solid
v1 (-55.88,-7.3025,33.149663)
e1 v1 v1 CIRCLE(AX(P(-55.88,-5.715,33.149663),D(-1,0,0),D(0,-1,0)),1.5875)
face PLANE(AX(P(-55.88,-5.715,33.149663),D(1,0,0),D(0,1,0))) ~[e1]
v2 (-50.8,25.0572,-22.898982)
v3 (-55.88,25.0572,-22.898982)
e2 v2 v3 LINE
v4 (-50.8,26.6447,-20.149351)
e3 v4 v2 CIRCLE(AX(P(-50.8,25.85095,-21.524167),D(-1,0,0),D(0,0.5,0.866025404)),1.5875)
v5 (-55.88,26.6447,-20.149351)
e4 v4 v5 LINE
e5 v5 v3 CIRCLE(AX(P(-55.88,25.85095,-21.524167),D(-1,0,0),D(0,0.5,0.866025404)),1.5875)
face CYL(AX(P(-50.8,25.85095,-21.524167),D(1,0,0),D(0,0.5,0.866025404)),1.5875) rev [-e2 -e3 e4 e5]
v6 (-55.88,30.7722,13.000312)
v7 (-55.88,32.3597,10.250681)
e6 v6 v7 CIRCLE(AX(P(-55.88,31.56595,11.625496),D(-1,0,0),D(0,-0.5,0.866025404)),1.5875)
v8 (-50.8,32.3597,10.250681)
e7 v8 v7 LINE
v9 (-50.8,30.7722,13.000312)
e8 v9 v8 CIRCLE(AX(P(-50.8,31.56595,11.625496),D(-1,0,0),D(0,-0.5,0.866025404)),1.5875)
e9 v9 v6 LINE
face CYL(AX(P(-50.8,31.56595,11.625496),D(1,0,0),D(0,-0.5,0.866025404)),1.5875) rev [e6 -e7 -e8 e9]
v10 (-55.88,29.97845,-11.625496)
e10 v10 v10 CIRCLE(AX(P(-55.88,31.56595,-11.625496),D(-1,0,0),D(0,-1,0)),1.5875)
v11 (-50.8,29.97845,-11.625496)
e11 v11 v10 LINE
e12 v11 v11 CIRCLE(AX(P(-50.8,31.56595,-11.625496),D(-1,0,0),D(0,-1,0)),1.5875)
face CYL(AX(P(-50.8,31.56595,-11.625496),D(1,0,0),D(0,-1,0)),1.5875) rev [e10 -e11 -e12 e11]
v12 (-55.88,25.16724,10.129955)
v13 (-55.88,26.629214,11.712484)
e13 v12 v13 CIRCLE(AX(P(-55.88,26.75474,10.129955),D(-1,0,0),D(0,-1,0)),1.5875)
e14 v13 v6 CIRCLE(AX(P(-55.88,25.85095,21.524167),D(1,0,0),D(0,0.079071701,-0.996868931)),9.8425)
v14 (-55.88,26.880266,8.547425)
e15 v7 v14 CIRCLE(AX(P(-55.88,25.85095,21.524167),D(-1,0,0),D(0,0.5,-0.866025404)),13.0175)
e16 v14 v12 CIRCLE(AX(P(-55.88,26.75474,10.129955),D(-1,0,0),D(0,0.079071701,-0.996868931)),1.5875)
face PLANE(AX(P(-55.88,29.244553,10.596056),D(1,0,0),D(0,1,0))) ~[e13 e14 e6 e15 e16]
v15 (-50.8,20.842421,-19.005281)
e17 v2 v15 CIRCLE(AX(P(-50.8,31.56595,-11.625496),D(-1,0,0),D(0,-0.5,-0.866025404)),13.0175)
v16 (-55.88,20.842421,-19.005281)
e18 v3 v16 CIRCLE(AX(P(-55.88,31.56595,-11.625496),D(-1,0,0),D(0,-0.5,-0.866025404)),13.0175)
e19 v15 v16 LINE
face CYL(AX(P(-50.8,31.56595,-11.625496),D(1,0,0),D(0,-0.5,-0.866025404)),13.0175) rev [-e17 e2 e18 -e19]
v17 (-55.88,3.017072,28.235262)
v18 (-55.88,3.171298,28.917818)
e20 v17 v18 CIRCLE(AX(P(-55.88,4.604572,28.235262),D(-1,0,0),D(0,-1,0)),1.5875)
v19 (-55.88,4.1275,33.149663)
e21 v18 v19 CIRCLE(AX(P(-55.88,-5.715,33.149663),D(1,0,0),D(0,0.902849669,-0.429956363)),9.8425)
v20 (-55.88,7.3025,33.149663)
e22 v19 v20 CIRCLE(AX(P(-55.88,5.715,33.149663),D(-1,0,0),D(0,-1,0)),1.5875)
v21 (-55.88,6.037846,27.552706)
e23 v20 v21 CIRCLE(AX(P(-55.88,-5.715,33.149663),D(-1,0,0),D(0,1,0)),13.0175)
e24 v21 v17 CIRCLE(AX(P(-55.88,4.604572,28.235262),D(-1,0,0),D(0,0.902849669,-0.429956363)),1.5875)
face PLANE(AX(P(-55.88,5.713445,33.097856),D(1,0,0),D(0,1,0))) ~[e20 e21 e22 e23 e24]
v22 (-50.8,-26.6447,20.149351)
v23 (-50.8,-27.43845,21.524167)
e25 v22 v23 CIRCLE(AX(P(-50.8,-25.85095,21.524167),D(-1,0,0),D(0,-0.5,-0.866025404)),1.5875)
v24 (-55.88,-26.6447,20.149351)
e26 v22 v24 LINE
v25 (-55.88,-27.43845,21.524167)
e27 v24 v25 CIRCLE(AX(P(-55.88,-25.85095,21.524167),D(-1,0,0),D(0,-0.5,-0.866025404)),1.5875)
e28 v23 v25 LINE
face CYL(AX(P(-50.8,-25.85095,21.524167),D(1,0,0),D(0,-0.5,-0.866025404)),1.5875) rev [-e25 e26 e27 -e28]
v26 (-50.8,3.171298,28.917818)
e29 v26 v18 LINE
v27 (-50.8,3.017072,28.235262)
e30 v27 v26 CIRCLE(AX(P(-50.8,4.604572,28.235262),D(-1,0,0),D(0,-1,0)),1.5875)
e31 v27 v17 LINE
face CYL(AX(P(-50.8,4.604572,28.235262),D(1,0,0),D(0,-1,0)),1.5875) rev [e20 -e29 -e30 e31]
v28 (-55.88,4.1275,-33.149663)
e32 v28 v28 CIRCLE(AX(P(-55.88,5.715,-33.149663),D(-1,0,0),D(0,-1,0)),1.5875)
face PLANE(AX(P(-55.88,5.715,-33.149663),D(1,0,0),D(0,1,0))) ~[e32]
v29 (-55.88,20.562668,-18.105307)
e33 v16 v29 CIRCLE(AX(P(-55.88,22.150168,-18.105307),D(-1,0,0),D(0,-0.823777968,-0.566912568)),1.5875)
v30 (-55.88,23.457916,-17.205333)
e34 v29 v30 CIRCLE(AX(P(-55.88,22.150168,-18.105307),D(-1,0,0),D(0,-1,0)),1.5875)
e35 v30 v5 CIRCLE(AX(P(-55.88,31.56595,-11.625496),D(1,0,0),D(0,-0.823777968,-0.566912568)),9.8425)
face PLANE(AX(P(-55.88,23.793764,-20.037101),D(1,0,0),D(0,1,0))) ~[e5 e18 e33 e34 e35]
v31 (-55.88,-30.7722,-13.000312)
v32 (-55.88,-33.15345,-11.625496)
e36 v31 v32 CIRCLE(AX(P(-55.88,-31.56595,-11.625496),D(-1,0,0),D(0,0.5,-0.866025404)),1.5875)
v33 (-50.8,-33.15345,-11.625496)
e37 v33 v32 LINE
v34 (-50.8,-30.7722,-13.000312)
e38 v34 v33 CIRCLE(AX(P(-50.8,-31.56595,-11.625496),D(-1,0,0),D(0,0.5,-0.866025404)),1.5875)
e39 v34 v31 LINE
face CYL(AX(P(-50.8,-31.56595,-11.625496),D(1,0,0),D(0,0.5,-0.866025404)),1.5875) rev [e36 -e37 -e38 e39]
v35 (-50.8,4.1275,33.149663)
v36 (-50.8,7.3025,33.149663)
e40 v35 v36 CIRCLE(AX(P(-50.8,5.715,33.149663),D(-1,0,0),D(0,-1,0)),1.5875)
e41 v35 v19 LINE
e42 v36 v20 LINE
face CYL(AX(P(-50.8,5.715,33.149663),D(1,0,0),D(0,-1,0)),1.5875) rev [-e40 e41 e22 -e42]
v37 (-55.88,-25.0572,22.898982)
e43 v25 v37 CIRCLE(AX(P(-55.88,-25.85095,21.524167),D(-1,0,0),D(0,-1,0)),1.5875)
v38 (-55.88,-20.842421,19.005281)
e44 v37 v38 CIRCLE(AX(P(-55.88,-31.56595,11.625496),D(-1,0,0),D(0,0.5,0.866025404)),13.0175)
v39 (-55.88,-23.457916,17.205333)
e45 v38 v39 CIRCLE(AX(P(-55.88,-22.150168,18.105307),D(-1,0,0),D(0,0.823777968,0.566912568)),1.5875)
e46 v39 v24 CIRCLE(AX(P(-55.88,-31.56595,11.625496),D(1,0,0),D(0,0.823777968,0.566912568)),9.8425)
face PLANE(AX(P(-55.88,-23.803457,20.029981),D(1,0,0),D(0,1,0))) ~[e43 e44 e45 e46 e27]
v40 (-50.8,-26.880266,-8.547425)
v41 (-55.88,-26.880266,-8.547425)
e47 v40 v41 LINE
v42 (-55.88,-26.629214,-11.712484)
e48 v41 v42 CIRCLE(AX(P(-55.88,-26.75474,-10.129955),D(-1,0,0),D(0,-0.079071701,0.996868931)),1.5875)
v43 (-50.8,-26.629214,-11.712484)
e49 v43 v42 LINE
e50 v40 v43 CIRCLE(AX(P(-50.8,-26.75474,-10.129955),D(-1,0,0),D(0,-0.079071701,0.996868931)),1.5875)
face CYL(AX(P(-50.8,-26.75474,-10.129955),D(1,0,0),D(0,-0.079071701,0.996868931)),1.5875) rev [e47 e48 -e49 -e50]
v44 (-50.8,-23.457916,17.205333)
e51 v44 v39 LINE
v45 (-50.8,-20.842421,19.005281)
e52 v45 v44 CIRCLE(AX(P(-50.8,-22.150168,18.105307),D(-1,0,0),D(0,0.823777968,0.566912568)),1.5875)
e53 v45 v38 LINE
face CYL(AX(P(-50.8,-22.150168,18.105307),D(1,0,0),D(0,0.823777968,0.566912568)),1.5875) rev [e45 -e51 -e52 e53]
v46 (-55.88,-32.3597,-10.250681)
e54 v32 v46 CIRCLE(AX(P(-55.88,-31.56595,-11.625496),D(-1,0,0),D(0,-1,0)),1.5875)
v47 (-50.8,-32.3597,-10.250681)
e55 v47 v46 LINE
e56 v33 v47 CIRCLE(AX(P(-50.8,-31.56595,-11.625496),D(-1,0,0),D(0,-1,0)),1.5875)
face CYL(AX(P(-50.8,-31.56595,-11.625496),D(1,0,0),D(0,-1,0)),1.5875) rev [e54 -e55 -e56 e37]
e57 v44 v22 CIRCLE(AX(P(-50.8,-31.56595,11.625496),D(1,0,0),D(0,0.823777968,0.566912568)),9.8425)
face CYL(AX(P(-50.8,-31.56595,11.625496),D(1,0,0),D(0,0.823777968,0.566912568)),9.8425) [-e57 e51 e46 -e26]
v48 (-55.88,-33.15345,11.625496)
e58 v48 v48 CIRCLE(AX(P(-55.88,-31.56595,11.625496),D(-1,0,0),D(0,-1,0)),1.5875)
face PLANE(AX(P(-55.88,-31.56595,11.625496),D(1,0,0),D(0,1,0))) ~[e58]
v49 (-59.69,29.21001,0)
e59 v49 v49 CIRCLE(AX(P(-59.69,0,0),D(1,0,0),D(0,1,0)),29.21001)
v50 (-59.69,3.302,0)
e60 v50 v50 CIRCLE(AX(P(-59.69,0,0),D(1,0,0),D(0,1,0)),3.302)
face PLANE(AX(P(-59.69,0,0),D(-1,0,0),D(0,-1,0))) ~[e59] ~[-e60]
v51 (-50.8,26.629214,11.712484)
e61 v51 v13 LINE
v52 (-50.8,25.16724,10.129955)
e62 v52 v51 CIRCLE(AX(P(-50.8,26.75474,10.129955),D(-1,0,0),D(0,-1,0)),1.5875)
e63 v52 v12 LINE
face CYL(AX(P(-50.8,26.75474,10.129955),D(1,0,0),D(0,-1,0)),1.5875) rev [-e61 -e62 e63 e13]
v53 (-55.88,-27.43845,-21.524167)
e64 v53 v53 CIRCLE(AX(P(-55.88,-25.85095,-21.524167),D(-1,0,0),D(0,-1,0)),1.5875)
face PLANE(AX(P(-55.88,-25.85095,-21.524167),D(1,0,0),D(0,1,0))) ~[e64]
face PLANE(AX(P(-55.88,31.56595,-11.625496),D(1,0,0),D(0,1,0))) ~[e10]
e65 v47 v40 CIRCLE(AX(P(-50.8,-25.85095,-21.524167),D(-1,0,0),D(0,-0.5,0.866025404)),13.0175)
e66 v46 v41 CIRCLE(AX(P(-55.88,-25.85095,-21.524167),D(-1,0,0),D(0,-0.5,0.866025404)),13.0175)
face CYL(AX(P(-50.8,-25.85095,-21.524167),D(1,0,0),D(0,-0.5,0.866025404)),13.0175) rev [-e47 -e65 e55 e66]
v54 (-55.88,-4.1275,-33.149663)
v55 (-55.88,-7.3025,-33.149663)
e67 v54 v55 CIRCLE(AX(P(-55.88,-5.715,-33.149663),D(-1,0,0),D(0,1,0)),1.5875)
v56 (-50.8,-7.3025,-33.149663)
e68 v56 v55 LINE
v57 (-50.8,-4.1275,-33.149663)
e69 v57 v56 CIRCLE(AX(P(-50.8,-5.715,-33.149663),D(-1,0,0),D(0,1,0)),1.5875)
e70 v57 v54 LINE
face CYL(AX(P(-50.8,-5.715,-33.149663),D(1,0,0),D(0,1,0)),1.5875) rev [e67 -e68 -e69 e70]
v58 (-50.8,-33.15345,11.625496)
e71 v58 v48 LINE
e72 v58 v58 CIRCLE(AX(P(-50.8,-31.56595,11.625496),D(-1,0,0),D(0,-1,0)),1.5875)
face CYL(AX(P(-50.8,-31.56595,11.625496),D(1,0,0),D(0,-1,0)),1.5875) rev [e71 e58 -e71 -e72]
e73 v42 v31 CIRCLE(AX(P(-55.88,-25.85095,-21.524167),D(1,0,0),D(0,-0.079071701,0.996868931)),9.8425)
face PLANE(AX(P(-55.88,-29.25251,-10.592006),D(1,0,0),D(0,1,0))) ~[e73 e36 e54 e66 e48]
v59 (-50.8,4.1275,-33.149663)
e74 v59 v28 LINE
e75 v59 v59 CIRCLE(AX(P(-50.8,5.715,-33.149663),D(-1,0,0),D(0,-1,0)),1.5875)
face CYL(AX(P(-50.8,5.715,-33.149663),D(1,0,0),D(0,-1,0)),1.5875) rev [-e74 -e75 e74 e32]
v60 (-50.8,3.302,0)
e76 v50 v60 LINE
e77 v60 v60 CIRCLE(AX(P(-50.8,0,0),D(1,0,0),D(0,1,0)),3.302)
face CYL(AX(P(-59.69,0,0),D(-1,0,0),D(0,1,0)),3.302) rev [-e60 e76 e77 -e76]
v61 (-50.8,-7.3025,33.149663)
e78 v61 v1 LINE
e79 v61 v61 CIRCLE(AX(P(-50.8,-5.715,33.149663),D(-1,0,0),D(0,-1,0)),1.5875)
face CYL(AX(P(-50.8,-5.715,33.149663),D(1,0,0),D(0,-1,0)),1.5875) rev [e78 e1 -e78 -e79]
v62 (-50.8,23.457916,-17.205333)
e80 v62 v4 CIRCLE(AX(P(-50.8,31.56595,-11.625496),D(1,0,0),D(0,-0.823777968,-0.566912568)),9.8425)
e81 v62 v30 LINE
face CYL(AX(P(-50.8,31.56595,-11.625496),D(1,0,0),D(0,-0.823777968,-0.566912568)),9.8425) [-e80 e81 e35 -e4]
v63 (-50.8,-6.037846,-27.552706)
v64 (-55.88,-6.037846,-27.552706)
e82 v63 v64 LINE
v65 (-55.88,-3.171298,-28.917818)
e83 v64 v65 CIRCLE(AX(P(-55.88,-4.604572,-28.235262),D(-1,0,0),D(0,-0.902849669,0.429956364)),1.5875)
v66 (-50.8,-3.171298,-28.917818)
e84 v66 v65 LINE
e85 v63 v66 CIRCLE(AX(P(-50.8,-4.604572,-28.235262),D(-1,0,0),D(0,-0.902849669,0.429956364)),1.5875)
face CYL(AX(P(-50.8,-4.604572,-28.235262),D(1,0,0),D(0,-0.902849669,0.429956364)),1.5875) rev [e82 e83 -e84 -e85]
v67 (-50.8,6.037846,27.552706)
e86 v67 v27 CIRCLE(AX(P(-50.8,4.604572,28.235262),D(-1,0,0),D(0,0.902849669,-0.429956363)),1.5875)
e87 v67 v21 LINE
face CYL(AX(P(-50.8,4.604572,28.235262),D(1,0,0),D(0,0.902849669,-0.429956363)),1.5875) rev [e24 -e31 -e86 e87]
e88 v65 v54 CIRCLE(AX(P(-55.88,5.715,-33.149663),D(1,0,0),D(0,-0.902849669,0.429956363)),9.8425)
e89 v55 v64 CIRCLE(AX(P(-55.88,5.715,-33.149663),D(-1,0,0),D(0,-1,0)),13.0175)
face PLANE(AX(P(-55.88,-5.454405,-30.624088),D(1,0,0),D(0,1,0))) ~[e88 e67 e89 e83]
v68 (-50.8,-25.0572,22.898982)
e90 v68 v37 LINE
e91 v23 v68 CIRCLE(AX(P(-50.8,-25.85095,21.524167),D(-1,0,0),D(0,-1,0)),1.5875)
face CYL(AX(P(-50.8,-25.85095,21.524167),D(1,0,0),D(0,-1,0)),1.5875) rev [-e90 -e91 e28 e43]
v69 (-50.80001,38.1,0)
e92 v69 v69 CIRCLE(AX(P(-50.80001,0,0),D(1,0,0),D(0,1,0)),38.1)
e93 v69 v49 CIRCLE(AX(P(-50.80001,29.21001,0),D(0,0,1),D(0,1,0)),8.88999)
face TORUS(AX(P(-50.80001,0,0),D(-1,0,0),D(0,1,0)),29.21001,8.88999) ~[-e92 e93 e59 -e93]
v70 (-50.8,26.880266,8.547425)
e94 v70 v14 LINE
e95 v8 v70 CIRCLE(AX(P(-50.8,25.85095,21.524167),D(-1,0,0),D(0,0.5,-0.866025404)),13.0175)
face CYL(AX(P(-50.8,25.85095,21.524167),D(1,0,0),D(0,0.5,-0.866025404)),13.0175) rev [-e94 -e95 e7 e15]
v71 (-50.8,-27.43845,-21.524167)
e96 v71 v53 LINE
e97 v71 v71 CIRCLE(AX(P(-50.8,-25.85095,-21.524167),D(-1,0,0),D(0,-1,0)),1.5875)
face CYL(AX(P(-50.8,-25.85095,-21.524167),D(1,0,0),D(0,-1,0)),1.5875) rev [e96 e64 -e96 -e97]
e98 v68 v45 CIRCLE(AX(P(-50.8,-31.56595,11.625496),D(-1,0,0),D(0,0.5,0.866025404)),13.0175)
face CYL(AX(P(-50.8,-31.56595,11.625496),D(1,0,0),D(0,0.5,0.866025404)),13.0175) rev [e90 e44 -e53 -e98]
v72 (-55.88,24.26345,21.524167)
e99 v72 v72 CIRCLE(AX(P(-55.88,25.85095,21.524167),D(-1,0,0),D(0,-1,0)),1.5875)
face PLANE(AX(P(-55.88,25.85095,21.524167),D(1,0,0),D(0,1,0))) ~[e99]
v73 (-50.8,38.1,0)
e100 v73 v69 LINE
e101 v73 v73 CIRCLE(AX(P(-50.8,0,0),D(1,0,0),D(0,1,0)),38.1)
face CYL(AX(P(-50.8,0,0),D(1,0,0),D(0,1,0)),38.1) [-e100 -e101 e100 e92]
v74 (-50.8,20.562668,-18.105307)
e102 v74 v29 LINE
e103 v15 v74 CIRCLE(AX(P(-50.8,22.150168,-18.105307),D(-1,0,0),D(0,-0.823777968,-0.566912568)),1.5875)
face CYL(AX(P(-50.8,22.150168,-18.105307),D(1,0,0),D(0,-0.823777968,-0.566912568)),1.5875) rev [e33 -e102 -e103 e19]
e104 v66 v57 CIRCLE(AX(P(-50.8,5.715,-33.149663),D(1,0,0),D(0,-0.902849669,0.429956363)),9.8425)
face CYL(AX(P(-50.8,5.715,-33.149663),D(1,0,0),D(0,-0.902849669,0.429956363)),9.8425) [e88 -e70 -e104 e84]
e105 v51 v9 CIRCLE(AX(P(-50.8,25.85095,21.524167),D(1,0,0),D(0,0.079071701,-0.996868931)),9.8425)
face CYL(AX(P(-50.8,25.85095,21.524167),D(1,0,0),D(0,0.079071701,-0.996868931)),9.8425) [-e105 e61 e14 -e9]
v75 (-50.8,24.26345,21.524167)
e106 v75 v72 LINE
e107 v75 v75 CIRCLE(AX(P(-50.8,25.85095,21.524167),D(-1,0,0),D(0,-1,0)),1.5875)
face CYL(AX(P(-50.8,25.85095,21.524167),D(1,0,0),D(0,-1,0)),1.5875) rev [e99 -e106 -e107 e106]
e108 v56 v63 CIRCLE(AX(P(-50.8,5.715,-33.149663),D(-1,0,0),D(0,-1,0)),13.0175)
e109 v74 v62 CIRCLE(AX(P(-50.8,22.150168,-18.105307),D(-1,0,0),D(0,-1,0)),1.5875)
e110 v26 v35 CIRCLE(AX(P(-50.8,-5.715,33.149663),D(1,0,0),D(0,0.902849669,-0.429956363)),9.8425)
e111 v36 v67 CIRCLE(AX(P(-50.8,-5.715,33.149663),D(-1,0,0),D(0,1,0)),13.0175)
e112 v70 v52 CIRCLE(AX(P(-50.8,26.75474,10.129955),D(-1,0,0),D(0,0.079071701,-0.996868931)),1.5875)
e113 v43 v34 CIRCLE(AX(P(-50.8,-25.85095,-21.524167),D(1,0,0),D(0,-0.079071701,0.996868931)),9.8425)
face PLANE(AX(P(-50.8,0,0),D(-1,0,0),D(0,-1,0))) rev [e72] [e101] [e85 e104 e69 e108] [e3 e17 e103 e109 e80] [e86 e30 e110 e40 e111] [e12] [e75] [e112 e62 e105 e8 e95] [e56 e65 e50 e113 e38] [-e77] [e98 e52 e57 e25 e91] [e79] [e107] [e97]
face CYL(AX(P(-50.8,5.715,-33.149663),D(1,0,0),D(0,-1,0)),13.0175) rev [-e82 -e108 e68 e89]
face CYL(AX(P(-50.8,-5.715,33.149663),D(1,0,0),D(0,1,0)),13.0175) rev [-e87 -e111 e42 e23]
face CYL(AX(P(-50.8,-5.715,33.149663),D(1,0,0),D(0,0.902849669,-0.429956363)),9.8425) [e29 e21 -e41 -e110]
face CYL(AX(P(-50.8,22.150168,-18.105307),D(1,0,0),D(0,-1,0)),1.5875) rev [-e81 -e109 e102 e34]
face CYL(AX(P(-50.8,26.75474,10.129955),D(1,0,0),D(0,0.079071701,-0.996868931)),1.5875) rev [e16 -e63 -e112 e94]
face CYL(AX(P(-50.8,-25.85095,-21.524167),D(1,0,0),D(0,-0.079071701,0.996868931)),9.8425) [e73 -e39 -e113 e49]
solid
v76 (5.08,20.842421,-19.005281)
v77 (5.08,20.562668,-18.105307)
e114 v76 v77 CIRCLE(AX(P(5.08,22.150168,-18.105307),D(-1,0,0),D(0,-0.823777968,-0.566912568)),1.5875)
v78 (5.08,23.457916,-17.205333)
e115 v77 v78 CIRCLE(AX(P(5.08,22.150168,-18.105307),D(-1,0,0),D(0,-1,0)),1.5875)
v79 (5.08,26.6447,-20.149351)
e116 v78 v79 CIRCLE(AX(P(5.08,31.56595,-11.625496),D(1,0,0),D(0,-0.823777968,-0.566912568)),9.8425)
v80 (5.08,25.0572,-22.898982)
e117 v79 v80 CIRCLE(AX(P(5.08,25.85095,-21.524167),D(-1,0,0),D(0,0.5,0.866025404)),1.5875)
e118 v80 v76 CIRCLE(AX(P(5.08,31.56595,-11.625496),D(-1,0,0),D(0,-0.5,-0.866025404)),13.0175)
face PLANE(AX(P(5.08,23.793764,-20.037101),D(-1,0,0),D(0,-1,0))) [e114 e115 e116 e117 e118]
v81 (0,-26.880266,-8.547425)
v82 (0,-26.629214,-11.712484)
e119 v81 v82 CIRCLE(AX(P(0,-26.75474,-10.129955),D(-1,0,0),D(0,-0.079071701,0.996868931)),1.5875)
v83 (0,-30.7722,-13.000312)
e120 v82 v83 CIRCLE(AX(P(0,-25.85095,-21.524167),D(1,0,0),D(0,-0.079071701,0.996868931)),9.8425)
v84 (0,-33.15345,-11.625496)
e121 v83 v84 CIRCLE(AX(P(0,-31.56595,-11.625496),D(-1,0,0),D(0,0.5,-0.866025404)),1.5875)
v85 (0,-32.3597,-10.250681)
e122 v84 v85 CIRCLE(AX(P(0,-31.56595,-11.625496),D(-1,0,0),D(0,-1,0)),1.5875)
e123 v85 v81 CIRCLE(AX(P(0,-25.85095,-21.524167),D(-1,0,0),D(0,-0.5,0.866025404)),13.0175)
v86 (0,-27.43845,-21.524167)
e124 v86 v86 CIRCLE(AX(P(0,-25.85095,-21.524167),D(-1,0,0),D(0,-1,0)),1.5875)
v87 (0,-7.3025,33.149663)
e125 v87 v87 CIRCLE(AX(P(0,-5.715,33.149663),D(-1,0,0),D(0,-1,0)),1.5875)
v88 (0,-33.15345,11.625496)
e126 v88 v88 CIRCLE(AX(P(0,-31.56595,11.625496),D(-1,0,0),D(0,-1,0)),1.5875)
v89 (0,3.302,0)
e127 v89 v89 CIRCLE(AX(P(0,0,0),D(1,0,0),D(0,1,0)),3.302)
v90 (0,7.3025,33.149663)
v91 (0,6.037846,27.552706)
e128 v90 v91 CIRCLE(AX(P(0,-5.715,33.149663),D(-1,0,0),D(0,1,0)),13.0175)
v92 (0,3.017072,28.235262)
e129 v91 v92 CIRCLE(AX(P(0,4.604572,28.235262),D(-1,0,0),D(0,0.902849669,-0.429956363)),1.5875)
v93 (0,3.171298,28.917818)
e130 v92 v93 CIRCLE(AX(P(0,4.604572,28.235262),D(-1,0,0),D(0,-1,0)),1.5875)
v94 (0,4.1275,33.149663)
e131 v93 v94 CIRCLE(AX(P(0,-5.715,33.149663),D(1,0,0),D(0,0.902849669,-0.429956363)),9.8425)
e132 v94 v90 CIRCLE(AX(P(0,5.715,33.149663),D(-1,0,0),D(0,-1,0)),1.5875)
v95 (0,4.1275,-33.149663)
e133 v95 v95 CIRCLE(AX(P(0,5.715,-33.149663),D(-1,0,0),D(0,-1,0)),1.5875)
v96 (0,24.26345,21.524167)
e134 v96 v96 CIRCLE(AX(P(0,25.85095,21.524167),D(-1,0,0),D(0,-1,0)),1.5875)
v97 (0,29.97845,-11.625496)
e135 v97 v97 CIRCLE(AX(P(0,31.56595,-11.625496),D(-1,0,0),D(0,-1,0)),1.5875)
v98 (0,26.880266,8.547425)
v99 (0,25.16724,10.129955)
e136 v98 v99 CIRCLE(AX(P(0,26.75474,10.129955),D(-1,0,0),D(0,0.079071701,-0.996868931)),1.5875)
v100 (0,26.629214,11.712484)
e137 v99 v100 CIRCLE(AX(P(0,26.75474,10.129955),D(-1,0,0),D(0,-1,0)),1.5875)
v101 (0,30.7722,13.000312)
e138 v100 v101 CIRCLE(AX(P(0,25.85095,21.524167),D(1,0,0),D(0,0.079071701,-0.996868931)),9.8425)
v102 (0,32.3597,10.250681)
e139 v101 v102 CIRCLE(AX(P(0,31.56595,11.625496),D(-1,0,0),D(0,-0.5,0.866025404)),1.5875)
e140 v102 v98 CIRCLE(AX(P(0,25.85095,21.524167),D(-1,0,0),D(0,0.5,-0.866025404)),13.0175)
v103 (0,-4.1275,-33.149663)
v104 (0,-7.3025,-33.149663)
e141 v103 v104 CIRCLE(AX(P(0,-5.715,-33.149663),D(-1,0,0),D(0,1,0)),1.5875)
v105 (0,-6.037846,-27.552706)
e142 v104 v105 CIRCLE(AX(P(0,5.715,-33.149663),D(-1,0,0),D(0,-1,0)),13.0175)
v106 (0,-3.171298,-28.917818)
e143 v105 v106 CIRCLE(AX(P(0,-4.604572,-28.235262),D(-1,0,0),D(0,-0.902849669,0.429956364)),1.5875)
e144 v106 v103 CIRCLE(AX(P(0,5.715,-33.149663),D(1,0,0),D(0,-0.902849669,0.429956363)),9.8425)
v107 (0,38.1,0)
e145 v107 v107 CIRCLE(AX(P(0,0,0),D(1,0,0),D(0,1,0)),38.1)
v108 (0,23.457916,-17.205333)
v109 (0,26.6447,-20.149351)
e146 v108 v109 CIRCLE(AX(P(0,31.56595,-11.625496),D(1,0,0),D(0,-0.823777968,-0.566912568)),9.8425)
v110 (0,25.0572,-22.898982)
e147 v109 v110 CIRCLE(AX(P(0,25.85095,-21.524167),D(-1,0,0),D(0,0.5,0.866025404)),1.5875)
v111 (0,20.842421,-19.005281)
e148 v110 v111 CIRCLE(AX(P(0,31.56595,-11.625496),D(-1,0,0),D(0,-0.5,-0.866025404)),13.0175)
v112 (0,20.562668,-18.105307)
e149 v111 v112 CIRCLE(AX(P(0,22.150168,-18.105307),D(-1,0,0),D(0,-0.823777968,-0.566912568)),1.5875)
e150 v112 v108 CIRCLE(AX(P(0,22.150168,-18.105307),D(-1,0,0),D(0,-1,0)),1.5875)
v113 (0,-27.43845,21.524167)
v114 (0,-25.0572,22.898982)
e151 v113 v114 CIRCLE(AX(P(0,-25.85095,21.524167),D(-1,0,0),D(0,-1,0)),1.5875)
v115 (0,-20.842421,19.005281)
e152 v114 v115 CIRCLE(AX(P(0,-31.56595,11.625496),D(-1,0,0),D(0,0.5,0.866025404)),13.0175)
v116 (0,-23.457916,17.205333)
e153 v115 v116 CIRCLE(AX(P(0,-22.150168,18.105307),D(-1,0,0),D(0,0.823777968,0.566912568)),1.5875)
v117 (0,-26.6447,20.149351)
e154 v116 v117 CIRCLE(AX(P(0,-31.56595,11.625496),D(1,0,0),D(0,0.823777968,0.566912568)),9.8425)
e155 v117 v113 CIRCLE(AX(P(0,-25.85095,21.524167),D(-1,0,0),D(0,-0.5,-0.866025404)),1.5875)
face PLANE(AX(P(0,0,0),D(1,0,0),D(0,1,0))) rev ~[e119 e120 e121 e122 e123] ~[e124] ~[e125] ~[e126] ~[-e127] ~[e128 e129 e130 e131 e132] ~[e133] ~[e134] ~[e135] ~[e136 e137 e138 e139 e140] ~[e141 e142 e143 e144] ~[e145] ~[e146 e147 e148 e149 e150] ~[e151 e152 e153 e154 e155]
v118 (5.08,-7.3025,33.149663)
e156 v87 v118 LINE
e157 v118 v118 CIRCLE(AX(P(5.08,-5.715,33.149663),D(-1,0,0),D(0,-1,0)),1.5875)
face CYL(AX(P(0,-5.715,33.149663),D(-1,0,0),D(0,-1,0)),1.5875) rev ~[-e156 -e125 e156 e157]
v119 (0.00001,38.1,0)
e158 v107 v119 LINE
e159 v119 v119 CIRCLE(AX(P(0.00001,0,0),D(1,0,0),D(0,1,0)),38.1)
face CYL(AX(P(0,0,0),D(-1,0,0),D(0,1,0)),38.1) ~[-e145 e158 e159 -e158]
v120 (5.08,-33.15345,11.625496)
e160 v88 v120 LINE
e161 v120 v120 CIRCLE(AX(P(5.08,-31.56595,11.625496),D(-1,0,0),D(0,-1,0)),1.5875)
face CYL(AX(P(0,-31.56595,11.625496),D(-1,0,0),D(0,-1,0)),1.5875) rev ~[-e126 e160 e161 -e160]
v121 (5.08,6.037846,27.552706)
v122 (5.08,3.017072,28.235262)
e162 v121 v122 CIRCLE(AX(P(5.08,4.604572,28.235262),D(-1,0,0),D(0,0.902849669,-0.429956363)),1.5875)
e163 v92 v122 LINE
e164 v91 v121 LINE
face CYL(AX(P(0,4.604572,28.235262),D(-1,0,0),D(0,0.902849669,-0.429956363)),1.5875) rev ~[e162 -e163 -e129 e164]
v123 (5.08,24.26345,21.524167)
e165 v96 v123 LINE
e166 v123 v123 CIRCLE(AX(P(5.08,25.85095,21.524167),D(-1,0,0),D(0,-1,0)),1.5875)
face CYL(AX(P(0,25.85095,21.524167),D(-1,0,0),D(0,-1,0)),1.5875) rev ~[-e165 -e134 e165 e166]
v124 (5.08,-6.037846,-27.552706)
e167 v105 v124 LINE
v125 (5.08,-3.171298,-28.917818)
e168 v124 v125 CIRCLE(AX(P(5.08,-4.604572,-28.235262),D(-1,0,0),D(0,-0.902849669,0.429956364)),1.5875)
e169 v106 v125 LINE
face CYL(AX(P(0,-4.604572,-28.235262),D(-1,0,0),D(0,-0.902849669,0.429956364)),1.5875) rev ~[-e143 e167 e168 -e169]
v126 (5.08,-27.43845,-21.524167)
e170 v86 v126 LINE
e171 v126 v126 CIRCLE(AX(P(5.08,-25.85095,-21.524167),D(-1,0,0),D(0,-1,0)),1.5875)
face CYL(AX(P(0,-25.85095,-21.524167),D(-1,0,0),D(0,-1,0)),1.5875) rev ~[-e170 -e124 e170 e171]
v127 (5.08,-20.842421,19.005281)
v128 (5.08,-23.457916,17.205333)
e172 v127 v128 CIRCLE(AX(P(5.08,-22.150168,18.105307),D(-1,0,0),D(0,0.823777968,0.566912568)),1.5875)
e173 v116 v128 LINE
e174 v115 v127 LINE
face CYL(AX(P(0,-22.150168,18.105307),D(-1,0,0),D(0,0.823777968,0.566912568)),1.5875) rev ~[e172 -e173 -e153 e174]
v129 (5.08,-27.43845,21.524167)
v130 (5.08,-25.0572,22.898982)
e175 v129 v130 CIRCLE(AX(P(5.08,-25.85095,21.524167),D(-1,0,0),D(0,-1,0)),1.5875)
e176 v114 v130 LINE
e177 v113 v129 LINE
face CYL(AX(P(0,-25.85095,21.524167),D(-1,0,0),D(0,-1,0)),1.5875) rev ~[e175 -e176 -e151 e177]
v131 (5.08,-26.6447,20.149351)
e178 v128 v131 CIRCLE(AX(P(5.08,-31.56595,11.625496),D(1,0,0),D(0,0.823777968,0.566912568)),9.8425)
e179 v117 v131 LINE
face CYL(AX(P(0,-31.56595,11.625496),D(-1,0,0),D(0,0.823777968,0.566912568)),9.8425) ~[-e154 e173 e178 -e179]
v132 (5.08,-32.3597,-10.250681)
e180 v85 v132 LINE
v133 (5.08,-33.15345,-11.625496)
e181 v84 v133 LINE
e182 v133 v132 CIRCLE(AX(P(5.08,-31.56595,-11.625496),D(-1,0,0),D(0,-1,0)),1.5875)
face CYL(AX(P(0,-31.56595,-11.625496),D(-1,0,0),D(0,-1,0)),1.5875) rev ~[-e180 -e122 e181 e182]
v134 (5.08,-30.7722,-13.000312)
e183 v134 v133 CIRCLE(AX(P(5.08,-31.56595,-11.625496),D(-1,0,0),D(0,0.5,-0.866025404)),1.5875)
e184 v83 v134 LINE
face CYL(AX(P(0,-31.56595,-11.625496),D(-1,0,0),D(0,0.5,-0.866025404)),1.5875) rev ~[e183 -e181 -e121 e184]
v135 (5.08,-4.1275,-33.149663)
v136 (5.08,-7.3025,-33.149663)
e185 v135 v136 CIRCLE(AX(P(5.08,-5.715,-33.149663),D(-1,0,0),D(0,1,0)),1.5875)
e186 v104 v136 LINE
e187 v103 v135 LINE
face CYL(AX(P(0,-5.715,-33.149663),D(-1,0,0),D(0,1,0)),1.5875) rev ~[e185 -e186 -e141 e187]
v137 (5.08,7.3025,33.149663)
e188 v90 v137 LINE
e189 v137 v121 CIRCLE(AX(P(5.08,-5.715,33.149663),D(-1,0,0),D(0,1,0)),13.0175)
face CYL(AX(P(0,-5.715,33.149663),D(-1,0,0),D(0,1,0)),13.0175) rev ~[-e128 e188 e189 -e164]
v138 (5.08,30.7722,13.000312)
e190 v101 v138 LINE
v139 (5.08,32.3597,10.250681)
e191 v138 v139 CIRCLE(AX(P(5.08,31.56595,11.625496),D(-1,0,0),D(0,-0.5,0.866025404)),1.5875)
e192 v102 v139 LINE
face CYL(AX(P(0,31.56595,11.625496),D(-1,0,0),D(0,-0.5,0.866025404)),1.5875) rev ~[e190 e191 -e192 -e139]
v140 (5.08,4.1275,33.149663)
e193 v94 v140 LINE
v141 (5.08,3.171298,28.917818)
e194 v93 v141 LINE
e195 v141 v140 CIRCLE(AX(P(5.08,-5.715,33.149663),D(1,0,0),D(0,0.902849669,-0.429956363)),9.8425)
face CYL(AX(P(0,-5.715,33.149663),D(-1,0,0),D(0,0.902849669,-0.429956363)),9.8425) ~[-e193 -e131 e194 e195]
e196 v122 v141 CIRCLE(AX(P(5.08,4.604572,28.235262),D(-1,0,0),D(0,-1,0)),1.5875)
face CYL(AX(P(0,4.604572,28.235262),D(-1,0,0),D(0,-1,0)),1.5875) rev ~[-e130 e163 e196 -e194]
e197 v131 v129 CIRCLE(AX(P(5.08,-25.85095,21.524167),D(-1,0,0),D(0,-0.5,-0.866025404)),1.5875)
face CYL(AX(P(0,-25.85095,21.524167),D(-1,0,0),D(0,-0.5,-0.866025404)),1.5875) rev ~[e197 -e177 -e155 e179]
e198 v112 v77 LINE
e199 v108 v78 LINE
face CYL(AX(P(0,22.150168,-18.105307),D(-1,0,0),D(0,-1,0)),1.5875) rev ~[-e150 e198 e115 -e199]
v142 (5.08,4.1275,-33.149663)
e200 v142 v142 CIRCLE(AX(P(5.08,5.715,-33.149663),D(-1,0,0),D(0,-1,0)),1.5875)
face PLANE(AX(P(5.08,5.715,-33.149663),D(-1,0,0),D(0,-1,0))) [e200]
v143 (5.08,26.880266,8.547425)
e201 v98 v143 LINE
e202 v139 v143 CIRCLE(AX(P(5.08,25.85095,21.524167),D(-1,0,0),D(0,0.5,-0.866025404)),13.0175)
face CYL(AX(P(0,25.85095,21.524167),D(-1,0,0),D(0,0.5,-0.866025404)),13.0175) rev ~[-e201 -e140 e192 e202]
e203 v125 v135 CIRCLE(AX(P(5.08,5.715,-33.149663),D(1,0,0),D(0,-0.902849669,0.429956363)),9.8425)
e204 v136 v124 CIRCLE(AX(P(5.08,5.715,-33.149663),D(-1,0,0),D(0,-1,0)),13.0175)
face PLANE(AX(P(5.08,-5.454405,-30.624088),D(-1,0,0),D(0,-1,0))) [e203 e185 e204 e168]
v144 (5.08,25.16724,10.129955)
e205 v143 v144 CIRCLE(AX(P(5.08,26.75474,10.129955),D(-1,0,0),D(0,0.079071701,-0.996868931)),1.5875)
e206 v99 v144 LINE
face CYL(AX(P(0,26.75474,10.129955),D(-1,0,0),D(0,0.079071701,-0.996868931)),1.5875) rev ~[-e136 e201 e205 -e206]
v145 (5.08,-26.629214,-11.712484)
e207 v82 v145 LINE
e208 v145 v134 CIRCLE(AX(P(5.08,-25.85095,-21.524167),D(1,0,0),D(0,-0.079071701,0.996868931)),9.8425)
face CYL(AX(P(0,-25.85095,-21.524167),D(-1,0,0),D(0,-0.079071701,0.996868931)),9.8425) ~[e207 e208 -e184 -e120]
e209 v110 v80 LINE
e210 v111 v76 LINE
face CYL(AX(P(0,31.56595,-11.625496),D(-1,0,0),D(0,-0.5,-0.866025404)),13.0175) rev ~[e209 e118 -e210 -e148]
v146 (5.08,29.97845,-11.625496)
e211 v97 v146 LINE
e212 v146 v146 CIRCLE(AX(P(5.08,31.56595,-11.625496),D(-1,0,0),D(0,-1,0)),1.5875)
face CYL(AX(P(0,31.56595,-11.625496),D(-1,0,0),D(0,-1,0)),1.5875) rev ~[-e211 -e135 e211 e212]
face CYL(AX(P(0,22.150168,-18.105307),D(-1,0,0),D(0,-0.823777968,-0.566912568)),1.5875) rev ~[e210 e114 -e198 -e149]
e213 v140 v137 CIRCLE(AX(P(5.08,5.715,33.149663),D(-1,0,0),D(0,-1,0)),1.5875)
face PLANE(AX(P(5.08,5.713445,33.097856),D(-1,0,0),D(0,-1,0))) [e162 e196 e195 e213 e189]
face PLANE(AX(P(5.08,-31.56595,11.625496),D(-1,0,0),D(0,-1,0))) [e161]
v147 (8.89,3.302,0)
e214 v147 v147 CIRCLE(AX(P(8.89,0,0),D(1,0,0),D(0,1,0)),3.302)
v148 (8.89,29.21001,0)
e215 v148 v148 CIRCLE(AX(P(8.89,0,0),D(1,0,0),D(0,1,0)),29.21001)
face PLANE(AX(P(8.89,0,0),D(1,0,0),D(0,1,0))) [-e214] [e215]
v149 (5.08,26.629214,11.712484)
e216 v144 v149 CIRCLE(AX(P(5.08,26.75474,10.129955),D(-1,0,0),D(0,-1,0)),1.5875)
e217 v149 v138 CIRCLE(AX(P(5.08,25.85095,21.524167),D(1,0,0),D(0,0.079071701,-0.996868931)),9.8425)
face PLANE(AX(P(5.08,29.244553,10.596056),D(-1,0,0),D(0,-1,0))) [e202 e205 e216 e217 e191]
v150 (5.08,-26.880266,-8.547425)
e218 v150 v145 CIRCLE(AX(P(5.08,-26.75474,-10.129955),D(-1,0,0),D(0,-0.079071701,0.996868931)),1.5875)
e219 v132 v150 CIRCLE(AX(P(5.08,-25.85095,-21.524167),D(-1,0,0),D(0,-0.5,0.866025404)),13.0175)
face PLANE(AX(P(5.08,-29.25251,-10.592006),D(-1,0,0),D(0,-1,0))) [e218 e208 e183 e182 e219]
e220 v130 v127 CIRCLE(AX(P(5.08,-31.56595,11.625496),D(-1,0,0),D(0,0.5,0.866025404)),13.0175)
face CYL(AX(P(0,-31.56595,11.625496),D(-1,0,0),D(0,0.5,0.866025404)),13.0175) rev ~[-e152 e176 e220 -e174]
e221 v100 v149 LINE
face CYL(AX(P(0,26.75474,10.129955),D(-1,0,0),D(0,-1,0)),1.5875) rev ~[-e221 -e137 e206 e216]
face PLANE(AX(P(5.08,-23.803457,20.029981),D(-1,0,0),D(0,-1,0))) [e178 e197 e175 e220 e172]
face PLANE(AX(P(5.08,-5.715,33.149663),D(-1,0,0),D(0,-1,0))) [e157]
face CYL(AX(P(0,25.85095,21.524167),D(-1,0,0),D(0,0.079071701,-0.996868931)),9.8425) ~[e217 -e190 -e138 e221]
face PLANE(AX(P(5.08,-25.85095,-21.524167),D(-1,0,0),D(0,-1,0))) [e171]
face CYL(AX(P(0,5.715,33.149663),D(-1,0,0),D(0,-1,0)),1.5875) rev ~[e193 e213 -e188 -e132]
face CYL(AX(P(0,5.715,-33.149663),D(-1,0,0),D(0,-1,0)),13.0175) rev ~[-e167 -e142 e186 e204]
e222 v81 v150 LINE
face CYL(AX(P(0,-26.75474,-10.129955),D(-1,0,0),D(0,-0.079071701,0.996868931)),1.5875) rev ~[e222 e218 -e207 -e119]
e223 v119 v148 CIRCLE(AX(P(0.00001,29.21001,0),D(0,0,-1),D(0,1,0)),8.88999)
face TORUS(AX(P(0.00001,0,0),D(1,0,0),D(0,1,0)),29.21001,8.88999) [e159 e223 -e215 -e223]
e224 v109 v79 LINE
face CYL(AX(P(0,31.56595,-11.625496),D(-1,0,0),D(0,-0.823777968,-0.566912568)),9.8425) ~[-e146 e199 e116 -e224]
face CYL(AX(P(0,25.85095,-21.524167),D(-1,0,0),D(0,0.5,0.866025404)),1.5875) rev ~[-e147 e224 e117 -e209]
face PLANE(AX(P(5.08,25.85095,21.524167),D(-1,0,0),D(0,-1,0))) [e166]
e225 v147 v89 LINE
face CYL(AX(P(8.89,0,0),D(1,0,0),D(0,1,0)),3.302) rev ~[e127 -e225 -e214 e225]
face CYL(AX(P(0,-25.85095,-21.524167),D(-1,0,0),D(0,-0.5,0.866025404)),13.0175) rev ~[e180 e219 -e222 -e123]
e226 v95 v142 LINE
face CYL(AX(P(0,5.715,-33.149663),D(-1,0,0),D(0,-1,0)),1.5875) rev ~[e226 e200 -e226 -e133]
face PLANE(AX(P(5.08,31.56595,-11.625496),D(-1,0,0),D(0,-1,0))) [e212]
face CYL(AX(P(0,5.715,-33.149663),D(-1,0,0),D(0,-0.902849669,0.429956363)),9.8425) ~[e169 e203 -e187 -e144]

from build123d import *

# Parameters (mm, degrees)
F0_R     = 38.1
F1_DEPTH = 8.89
F2_R     = 8.88999
F3_R     = 3.302
F4_DEPTH = 8.89
F5_R     = 1.5875
F6_DEPTH = 5.08


# Not quite as in the source:
# - a fillet or chamfer is up to 0.001 mm smaller than in the source, because OpenCascade refuses the exact size


with BuildPart() as f1:
    # F0 (on Right) → F1 (new body)
    with BuildSketch(Plane.YZ):
        Circle(F0_R)
    extrude(amount=F1_DEPTH)

    # F2 (radius 8.89 in the source; OpenCascade refuses exactly that, so slightly less here)
    f2_edges = [f1.edges().sort_by_distance(p)[0] for p in [
        (8.89, -38.1, 0),
    ]]
    fillet(f2_edges, radius=F2_R)

    # F3 (on face) → F4 (cut)
    with BuildSketch(Plane.YZ.offset(8.89)):
        Circle(F3_R)
    extrude(amount=-F4_DEPTH, mode=Mode.SUBTRACT)

    # F5 (on face) → F6 (cut)
    with BuildSketch(Plane(origin=(0, 0, 0), x_dir=(0, -1, 0), z_dir=(-1, 0, 0))):
        with Locations((5.715, 33.1496630312)):
            Circle(F5_R)
        with BuildLine():
            ThreePointArc((-5.6047569444, 31.5659955413), (-4.5541453363, 32.0668090708), (-4.1275, 33.1496630312))
            ThreePointArc((-4.1275, 33.1496630312), (-5.715, 34.7371630312), (-7.3025, 33.1496630312))
            ThreePointArc((-7.3025, 33.1496630312), (-6.7978539604, 31.9888083675), (-5.6047569444, 31.5659955413))
        make_face()
        with BuildLine():
            ThreePointArc((-3.1712978707, 28.9178175232), (-3.8854737654, 30.9803982412), (-4.1275, 33.1496630312))
            ThreePointArc((-4.1275, 33.1496630312), (-4.5541453363, 32.0668090708), (-5.6047569444, 31.5659955413))
            ThreePointArc((-5.6047569444, 31.5659955413), (-5.433937276, 30.6305168235), (-5.1859467295, 29.712475169))
            ThreePointArc((-5.1859467295, 29.712475169), (-4.0220744225, 29.712032986), (-3.1712978707, 28.9178175232))
        make_face()
        with BuildLine():
            ThreePointArc((-5.6047569444, 31.5659955413), (-6.7978539604, 31.9888083675), (-7.3025, 33.1496630312))
            ThreePointArc((-7.3025, 33.1496630312), (-6.9824007866, 30.2806354058), (-6.0378455709, 27.552706069))
            ThreePointArc((-6.0378455709, 27.552706069), (-6.0813429107, 28.8177590943), (-5.1859467295, 29.712475169))
            ThreePointArc((-5.1859467295, 29.712475169), (-5.433937276, 30.6305168235), (-5.6047569444, 31.5659955413))
        make_face()
        with BuildLine():
            ThreePointArc((-3.0170717208, 28.2352617961), (-3.0561082102, 28.5851432138), (-3.1712978707, 28.9178175232))
            ThreePointArc((-3.1712978707, 28.9178175232), (-4.0220744225, 29.712032986), (-5.1859467295, 29.712475169))
            ThreePointArc((-5.1859467295, 29.712475169), (-6.0813429107, 28.8177590943), (-6.0378455709, 27.552706069))
            ThreePointArc((-6.0378455709, 27.552706069), (-4.254690303, 26.6867982855), (-3.0170717208, 28.2352617961))
        make_face()
        with BuildLine():
            ThreePointArc((-26.6292135324, 11.7124842426), (-28.772548779, 12.125280134), (-30.7722003119, 13.0003116615))
            ThreePointArc((-30.7722003119, 13.0003116615), (-30.1911349834, 12.419246333), (-29.9784503119, 11.625496333))
            ThreePointArc((-29.9784503119, 11.625496333), (-30.7722003119, 10.2506810045), (-32.3597003119, 10.2506810045))
            ThreePointArc((-32.3597003119, 10.2506810045), (-29.7149998974, 9.0933812423), (-26.8802661842, 8.547425386))
            ThreePointArc((-26.8802661842, 8.547425386), (-28.3372692866, 10.2554811402), (-26.6292135324, 11.7124842426))
        make_face()
        with BuildLine():
            ThreePointArc((-29.9784503119, 11.625496333), (-30.1911349834, 12.419246333), (-30.7722003119, 13.0003116615))
            ThreePointArc((-30.7722003119, 13.0003116615), (-32.9407656404, 12.419246333), (-32.3597003119, 10.2506810045))
            ThreePointArc((-32.3597003119, 10.2506810045), (-30.7722003119, 10.2506810045), (-29.9784503119, 11.625496333))
        make_face()
        with BuildLine():
            ThreePointArc((-25.1672398583, 10.1299548143), (-25.5886718302, 11.2071927657), (-26.6292135324, 11.7124842426))
            ThreePointArc((-26.6292135324, 11.7124842426), (-28.3372692866, 10.2554811402), (-26.8802661842, 8.547425386))
            ThreePointArc((-26.8802661842, 8.547425386), (-25.6775019069, 8.9638867862), (-25.1672398583, 10.1299548143))
        make_face()
        with Locations((-25.8509503119, 21.5241666982)):
            Circle(F5_R)
        with BuildLine():
            ThreePointArc((-23.4579156617, -17.2053332806), (-24.8870750135, -18.8551181072), (-26.6447003119, -20.1493513697))
            ThreePointArc((-26.6447003119, -20.1493513697), (-25.0572003119, -20.1493513697), (-24.2634503119, -21.5241666982))
            ThreePointArc((-24.2634503119, -21.5241666982), (-24.4761349834, -22.3179166982), (-25.0572003119, -22.8989820267))
            ThreePointArc((-25.0572003119, -22.8989820267), (-22.7325991108, -21.1872541634), (-20.8424206133, -19.005280683))
            ThreePointArc((-20.8424206133, -19.005280683), (-23.0501418387, -19.413054506), (-23.4579156617, -17.2053332806))
        make_face()
        with BuildLine():
            ThreePointArc((-24.2634503119, -21.5241666982), (-25.0572003119, -20.1493513697), (-26.6447003119, -20.1493513697))
            ThreePointArc((-26.6447003119, -20.1493513697), (-27.2257656404, -22.3179166982), (-25.0572003119, -22.8989820267))
            ThreePointArc((-25.0572003119, -22.8989820267), (-24.4761349834, -22.3179166982), (-24.2634503119, -21.5241666982))
        make_face()
        with BuildLine():
            ThreePointArc((-20.5626681375, -18.1053069818), (-21.6789425783, -16.5893575359), (-23.4579156617, -17.2053332806))
            ThreePointArc((-23.4579156617, -17.2053332806), (-23.0501418387, -19.413054506), (-20.8424206133, -19.005280683))
            ThreePointArc((-20.8424206133, -19.005280683), (-20.6342186917, -18.576532541), (-20.5626681375, -18.1053069818))
        make_face()
        with Locations((-31.5659503119, -11.625496333)):
            Circle(F5_R)
        with BuildLine():
            ThreePointArc((3.1712978707, -28.9178175232), (3.8854737654, -30.9803982412), (4.1275, -33.1496630312))
            ThreePointArc((4.1275, -33.1496630312), (5.715, -31.5621630312), (7.3025, -33.1496630312))
            ThreePointArc((7.3025, -33.1496630312), (6.9824007866, -30.2806354058), (6.0378455709, -27.552706069))
            ThreePointArc((6.0378455709, -27.552706069), (6.1530352313, -27.8853803783), (6.1920717208, -28.2352617961))
            ThreePointArc((6.1920717208, -28.2352617961), (4.9544531385, -29.7837253066), (3.1712978707, -28.9178175232))
        make_face()
        with BuildLine():
            ThreePointArc((7.3025, -33.1496630312), (5.715, -31.5621630312), (4.1275, -33.1496630312))
            ThreePointArc((4.1275, -33.1496630312), (5.715, -34.7371630312), (7.3025, -33.1496630312))
        make_face()
        with BuildLine():
            ThreePointArc((6.0378455709, -27.552706069), (3.9220159937, -26.801987946), (3.1712978707, -28.9178175232))
            ThreePointArc((3.1712978707, -28.9178175232), (4.9544531385, -29.7837253066), (6.1920717208, -28.2352617961))
            ThreePointArc((6.1920717208, -28.2352617961), (6.1530352313, -27.8853803783), (6.0378455709, -27.552706069))
        make_face()
        with Locations((-5.715, -33.1496630312)):
            Circle(F5_R)
        with BuildLine():
            ThreePointArc((26.6292135324, -11.7124842426), (28.772548779, -12.125280134), (30.7722003119, -13.0003116615))
            ThreePointArc((30.7722003119, -13.0003116615), (30.1911349834, -10.831746333), (32.3597003119, -10.2506810045))
            ThreePointArc((32.3597003119, -10.2506810045), (29.7149998974, -9.0933812423), (26.8802661842, -8.547425386))
            ThreePointArc((26.8802661842, -8.547425386), (27.9208078864, -9.052716863), (28.3422398583, -10.1299548143))
            ThreePointArc((28.3422398583, -10.1299548143), (27.8319778096, -11.2960228424), (26.6292135324, -11.7124842426))
        make_face()
        with BuildLine():
            ThreePointArc((32.3597003119, -10.2506810045), (30.1911349834, -10.831746333), (30.7722003119, -13.0003116615))
            ThreePointArc((30.7722003119, -13.0003116615), (32.3597003119, -13.0003116615), (33.1534503119, -11.625496333))
            ThreePointArc((33.1534503119, -11.625496333), (32.9407656404, -10.831746333), (32.3597003119, -10.2506810045))
        make_face()
        with BuildLine():
            ThreePointArc((26.8802661842, -8.547425386), (25.17221043, -10.0044284884), (26.6292135324, -11.7124842426))
            ThreePointArc((26.6292135324, -11.7124842426), (27.8319778096, -11.2960228424), (28.3422398583, -10.1299548143))
            ThreePointArc((28.3422398583, -10.1299548143), (27.9208078864, -9.052716863), (26.8802661842, -8.547425386))
        make_face()
        with Locations((25.8509503119, -21.5241666982)):
            Circle(F5_R)
        with BuildLine():
            ThreePointArc((23.4579156617, 17.2053332806), (24.8870750135, 18.8551181072), (26.6447003119, 20.1493513697))
            ThreePointArc((26.6447003119, 20.1493513697), (24.4761349834, 20.7304166982), (25.0572003119, 22.8989820267))
            ThreePointArc((25.0572003119, 22.8989820267), (22.7325991108, 21.1872541634), (20.8424206133, 19.005280683))
            ThreePointArc((20.8424206133, 19.005280683), (22.6213936967, 19.6212564276), (23.7376681375, 18.1053069818))
            ThreePointArc((23.7376681375, 18.1053069818), (23.6661175834, 17.6340814226), (23.4579156617, 17.2053332806))
        make_face()
        with BuildLine():
            ThreePointArc((25.0572003119, 22.8989820267), (24.4761349834, 20.7304166982), (26.6447003119, 20.1493513697))
            ThreePointArc((26.6447003119, 20.1493513697), (27.2257656404, 20.7304166982), (27.4384503119, 21.5241666982))
            ThreePointArc((27.4384503119, 21.5241666982), (26.6447003119, 22.8989820267), (25.0572003119, 22.8989820267))
        make_face()
        with BuildLine():
            ThreePointArc((20.8424206133, 19.005280683), (21.2501944363, 16.7975594576), (23.4579156617, 17.2053332806))
            ThreePointArc((23.4579156617, 17.2053332806), (23.6661175834, 17.6340814226), (23.7376681375, 18.1053069818))
            ThreePointArc((23.7376681375, 18.1053069818), (22.6213936967, 19.6212564276), (20.8424206133, 19.005280683))
        make_face()
        with Locations((31.5659503119, 11.625496333)):
            Circle(F5_R)
    extrude(amount=-F6_DEPTH, mode=Mode.SUBTRACT)


with BuildPart() as f8_1:
    # F8: instance of F1
    add(f1.part.mirror(Plane.YZ.offset(-25.4)))


solid = Compound([f1.part, f8_1.part])
